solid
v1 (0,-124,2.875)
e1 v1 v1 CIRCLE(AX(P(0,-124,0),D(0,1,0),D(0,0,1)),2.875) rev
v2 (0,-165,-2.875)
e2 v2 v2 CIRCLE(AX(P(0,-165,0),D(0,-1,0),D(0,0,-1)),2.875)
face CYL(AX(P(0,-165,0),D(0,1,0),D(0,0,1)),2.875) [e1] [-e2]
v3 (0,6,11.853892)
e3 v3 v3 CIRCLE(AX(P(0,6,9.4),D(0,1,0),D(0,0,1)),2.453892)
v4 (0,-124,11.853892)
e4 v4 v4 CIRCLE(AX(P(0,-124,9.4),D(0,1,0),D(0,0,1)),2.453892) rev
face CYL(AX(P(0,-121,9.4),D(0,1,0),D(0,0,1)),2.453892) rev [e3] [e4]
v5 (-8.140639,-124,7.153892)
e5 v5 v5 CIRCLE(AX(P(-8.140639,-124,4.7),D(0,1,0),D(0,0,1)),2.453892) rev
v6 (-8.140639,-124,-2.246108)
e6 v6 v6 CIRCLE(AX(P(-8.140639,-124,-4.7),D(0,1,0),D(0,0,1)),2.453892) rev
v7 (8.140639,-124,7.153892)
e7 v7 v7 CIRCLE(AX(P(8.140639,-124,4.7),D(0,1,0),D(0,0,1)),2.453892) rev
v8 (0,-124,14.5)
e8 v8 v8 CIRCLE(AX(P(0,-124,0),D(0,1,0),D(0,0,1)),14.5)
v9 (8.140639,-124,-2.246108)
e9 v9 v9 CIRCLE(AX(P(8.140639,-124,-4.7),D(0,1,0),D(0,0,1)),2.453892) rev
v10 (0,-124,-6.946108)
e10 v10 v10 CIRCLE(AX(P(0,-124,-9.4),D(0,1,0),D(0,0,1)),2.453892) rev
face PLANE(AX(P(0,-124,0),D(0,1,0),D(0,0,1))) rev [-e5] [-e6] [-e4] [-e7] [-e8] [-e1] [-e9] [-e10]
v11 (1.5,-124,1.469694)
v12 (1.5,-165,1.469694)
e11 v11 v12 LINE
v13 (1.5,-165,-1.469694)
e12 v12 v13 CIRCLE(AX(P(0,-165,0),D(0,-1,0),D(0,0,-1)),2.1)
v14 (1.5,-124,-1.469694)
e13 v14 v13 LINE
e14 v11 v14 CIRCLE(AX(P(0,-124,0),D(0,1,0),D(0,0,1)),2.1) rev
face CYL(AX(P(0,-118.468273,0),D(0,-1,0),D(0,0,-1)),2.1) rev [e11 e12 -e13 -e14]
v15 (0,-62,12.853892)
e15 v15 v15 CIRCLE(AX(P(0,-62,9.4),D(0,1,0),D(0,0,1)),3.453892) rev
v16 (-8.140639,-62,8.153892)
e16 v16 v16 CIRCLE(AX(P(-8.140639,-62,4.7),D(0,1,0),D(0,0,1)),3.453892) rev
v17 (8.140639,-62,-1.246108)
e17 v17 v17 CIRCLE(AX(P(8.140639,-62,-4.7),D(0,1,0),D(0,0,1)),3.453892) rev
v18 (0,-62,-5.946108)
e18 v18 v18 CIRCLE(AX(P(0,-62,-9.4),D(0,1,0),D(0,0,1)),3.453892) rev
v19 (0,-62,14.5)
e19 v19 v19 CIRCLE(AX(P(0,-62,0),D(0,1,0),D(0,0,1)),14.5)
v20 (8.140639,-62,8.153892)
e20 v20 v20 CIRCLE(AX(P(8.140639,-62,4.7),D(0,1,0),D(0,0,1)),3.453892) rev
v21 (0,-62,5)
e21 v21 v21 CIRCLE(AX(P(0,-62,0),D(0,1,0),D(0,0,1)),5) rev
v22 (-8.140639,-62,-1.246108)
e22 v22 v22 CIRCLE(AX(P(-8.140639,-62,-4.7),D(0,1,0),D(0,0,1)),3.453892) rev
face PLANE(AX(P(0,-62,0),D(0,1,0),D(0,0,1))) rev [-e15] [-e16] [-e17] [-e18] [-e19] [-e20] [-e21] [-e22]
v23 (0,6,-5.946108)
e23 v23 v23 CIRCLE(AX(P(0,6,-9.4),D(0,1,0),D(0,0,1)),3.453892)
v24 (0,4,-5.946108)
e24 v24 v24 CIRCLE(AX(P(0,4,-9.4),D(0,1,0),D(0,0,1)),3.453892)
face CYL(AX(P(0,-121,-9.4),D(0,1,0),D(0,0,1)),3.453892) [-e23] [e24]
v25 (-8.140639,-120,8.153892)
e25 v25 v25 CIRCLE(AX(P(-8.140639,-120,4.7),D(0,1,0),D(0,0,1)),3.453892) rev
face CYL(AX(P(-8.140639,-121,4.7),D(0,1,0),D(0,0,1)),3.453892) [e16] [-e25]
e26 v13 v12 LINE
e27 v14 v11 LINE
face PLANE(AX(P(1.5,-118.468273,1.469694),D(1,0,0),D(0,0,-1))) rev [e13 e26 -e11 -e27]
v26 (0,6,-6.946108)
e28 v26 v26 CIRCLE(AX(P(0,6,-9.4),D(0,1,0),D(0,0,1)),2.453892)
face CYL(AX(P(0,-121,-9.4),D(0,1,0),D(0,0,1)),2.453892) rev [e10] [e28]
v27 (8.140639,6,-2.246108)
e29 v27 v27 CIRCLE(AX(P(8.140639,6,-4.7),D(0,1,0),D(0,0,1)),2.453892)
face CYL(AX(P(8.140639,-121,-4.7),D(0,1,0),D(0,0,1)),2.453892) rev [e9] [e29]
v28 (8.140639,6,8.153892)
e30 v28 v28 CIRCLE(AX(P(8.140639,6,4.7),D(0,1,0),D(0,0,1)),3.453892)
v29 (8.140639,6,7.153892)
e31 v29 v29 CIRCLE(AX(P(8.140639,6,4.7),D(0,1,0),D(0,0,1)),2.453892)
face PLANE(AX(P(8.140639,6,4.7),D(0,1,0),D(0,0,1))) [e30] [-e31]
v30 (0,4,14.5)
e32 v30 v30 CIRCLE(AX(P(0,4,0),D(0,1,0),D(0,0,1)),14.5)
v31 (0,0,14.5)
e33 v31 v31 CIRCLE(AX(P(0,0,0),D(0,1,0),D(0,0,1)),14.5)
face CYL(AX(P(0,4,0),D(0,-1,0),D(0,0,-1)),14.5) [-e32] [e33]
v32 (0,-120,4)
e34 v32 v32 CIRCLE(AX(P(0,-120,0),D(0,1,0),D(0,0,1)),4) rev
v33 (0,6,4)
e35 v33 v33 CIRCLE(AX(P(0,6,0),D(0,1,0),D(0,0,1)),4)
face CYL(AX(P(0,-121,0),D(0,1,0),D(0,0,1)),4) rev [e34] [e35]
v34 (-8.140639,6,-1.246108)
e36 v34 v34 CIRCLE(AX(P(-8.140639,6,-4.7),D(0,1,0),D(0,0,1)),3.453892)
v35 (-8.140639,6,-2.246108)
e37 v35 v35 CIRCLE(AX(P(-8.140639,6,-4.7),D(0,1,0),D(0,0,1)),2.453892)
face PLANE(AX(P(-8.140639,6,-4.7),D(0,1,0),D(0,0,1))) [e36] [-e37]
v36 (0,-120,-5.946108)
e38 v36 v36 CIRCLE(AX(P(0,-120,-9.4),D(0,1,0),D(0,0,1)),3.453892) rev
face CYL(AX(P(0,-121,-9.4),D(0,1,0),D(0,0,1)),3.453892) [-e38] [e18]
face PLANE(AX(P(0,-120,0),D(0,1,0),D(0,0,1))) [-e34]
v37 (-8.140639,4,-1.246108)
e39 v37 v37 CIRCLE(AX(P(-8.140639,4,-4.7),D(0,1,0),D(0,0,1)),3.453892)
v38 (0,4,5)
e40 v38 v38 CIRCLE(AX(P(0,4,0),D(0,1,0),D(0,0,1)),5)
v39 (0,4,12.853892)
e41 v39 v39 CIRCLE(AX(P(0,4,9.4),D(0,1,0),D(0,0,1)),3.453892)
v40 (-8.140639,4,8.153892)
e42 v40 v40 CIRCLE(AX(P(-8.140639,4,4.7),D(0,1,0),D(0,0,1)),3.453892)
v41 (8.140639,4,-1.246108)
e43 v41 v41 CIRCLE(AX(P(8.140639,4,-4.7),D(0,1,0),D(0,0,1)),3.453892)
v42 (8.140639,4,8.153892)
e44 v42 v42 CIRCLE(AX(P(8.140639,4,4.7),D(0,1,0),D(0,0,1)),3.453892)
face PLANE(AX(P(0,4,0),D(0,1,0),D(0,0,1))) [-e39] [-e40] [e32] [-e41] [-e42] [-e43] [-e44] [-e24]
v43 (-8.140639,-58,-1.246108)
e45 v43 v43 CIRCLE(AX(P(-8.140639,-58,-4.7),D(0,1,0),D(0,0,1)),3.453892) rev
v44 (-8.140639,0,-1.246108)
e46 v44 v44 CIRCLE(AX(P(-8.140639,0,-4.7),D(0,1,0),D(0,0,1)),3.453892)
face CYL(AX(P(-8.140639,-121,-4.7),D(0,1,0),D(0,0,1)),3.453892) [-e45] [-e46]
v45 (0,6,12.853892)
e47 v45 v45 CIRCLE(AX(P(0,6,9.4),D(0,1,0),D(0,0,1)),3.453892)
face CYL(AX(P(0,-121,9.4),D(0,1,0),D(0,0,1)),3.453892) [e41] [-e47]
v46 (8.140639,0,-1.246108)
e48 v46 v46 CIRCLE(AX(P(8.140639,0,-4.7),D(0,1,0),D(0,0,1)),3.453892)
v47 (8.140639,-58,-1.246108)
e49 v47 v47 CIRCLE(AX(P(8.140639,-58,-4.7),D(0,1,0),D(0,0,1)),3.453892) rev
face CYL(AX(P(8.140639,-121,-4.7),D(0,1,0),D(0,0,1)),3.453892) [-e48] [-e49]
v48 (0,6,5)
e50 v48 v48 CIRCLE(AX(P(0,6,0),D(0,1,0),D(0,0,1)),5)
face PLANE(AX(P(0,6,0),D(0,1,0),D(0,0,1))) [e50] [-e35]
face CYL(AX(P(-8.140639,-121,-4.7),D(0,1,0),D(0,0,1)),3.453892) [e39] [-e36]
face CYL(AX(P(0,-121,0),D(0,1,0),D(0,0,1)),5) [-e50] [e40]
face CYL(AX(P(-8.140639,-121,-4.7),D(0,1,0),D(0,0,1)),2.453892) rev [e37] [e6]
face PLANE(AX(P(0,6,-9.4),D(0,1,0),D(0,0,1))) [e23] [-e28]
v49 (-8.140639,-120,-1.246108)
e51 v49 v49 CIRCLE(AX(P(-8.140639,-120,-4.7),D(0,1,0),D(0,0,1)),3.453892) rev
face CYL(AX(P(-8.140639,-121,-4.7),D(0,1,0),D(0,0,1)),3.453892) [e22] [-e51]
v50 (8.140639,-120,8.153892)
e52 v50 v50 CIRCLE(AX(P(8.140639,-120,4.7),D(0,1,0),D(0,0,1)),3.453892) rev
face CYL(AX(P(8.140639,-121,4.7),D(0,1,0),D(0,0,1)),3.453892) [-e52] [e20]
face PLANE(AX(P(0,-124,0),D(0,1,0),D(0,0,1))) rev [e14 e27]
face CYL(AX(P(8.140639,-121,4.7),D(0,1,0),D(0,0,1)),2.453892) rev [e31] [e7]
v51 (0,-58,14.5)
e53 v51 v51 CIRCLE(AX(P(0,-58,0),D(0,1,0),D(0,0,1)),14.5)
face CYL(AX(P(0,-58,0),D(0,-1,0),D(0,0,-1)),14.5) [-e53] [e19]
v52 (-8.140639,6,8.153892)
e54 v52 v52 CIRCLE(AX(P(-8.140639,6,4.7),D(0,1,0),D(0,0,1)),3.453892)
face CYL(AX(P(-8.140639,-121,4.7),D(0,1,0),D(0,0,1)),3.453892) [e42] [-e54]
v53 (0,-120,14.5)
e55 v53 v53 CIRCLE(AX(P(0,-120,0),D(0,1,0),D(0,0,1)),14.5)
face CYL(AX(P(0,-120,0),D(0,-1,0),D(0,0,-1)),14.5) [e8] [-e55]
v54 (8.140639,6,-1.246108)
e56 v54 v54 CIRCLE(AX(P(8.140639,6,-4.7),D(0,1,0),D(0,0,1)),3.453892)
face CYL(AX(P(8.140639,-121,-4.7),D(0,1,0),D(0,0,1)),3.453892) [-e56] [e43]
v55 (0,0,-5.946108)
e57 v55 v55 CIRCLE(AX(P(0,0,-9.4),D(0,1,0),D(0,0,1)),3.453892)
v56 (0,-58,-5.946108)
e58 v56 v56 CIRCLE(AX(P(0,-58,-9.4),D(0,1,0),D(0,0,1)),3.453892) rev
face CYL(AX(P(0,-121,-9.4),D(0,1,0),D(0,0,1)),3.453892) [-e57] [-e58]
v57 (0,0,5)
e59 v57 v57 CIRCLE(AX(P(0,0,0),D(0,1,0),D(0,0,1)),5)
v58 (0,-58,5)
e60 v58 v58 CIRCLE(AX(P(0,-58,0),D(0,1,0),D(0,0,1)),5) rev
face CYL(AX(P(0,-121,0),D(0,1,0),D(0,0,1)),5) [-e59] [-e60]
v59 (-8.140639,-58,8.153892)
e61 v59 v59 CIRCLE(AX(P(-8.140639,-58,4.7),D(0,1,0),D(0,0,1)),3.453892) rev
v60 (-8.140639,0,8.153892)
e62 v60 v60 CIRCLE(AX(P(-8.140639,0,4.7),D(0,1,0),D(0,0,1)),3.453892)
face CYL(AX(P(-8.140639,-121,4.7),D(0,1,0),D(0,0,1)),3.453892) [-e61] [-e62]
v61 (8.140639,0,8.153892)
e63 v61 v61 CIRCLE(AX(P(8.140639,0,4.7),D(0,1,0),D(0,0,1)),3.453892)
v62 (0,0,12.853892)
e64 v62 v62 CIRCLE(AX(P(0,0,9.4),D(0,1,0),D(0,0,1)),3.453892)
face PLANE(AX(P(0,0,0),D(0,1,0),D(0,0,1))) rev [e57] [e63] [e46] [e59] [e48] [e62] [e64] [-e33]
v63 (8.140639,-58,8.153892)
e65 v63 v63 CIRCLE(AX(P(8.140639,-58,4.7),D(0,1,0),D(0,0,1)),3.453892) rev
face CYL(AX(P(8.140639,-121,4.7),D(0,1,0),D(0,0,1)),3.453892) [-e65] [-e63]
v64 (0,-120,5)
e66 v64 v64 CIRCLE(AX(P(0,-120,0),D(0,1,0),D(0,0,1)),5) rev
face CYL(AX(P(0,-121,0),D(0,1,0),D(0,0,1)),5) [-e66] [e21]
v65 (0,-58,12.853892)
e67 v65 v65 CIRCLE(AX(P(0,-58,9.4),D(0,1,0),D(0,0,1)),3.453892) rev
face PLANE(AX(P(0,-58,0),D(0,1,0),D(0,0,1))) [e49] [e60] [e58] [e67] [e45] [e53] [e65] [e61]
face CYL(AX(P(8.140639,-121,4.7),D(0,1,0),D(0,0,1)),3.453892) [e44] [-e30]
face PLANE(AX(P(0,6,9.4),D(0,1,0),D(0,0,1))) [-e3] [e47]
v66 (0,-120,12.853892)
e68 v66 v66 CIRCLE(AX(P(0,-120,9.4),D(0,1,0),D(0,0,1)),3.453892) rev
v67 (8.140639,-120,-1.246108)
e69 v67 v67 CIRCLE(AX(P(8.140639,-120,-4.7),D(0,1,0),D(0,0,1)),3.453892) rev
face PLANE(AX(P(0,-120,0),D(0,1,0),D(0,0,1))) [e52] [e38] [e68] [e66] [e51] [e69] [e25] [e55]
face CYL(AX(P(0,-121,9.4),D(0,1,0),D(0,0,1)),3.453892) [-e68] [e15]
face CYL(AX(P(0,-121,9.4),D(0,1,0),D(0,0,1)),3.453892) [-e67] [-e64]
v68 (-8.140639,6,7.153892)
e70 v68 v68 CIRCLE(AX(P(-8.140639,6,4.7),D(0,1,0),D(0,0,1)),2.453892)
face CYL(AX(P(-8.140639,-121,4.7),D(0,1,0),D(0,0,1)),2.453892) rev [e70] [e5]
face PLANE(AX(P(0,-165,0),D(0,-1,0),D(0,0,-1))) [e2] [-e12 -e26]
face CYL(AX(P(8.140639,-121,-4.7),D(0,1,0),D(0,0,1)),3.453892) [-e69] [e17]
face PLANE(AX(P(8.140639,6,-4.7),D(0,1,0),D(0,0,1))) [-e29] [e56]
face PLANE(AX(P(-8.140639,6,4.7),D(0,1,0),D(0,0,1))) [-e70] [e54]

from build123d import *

# Parameters (mm, degrees)
SKETCH1_R                = 14.5
BOSS_EXTRUDE1_DEPTH      = 4
BOSS_EXTRUDE2_DEPTH      = 2
BOSS_EXTRUDE2_DEPTH_BACK = 125
SKETCH2_R                = 5
SKETCH2_R_2              = 4
SKETCH2_R_3              = 3.453892414
SKETCH2_R_4              = 2.453892414
LPATTERN4_START          = -124
LPATTERN4_OUTLINE_R      = 14.5
LPATTERN4_DEPTH          = 4
LPATTERN4_START_2        = -62
LPATTERN4_2_OUTLINE_R    = 14.5
LPATTERN4_2_OUTLINE_R_2  = 3.453892414
LPATTERN4_2_OUTLINE_R_3  = 5
LPATTERN4_2_OUTLINE_R_4  = 4
LPATTERN4_2_OUTLINE_R_5  = 2.453892414
LPATTERN4_2_DEPTH        = 4
SKETCH8_R                = 2.453892414
CUT_EXTRUDE4_DEPTH       = 128
SKETCH12_R               = 2.875
BOSS_EXTRUDE4_DEPTH      = 41
CUT_EXTRUDE5_DEPTH       = 41
SKETCH14_R               = 4
CUT_EXTRUDE6_DEPTH       = 124


# Read off the part's stored shape, not the designer's step: LPattern4
with BuildPart() as part:
    # Sketch1 → Boss-Extrude1 (new body)
    with BuildSketch(Plane(origin=(0, 0, 0), x_dir=(1, 0, 0), z_dir=(0, 1, 0))):
        with Locations(Location((0, 0, 0), (0, 0, 270))):
            Circle(SKETCH1_R)
    extrude(amount=BOSS_EXTRUDE1_DEPTH)

    # Sketch2 → Boss-Extrude2 (add, two sides: drawn at the far end of the back side and taken through both)
    # profile 1 of 7: a face of its own
    with BuildSketch(Plane(origin=(0, 4, 0), x_dir=(1, 0, 0), z_dir=(0, 1, 0)).offset(-BOSS_EXTRUDE2_DEPTH_BACK)):
        with Locations(Location((0, 0, 0), (0, 0, 270))):
            Circle(SKETCH2_R)
        with Locations(Location((0, 0, 0), (0, 0, 270))):
            Circle(SKETCH2_R_2, mode=Mode.SUBTRACT)
    # profile 2 of 7: a face of its own
    with BuildSketch(Plane(origin=(0, 4, 0), x_dir=(1, 0, 0), z_dir=(0, 1, 0)).offset(-BOSS_EXTRUDE2_DEPTH_BACK)):
        with Locations(Location((0, 9.4, 0), (0, 0, 270))):
            Circle(SKETCH2_R_3)
        with Locations(Location((0, 9.4, 0), (0, 0, 270))):
            Circle(SKETCH2_R_4, mode=Mode.SUBTRACT)
    # profile 3 of 7: a face of its own
    with BuildSketch(Plane(origin=(0, 4, 0), x_dir=(1, 0, 0), z_dir=(0, 1, 0)).offset(-BOSS_EXTRUDE2_DEPTH_BACK)):
        with Locations(Location((8.140638796, 4.7, 0), (0, 0, 270))):
            Circle(SKETCH2_R_3)
        with Locations(Location((8.140638796, 4.7, 0), (0, 0, 270))):
            Circle(SKETCH2_R_4, mode=Mode.SUBTRACT)
    # profile 4 of 7: a face of its own
    with BuildSketch(Plane(origin=(0, 4, 0), x_dir=(1, 0, 0), z_dir=(0, 1, 0)).offset(-BOSS_EXTRUDE2_DEPTH_BACK)):
        with Locations(Location((8.140638796, -4.7, 0), (0, 0, 270))):
            Circle(SKETCH2_R_3)
        with Locations(Location((8.140638796, -4.7, 0), (0, 0, 270))):
            Circle(SKETCH2_R_4, mode=Mode.SUBTRACT)
    # profile 5 of 7: a face of its own
    with BuildSketch(Plane(origin=(0, 4, 0), x_dir=(1, 0, 0), z_dir=(0, 1, 0)).offset(-BOSS_EXTRUDE2_DEPTH_BACK)):
        with Locations(Location((0, -9.4, 0), (0, 0, 270))):
            Circle(SKETCH2_R_3)
        with Locations(Location((0, -9.4, 0), (0, 0, 270))):
            Circle(SKETCH2_R_4, mode=Mode.SUBTRACT)
    # profile 6 of 7: a face of its own
    with BuildSketch(Plane(origin=(0, 4, 0), x_dir=(1, 0, 0), z_dir=(0, 1, 0)).offset(-BOSS_EXTRUDE2_DEPTH_BACK)):
        with Locations(Location((-8.140638796, -4.7, 0), (0, 0, 270))):
            Circle(SKETCH2_R_3)
        with Locations(Location((-8.140638796, -4.7, 0), (0, 0, 270))):
            Circle(SKETCH2_R_4, mode=Mode.SUBTRACT)
    # profile 7 of 7: a face of its own
    with BuildSketch(Plane(origin=(0, 4, 0), x_dir=(1, 0, 0), z_dir=(0, 1, 0)).offset(-BOSS_EXTRUDE2_DEPTH_BACK)):
        with Locations(Location((-8.140638796, 4.7, 0), (0, 0, 270))):
            Circle(SKETCH2_R_3)
        with Locations(Location((-8.140638796, 4.7, 0), (0, 0, 270))):
            Circle(SKETCH2_R_4, mode=Mode.SUBTRACT)
    extrude(amount=BOSS_EXTRUDE2_DEPTH + BOSS_EXTRUDE2_DEPTH_BACK)

    # LPattern4 outline → LPattern4 (add)
    with BuildSketch(Plane(origin=(0, 0, 0), x_dir=(1, 0, 0), z_dir=(0, 1, 0)).offset(LPATTERN4_START)):
        Circle(LPATTERN4_OUTLINE_R)
    extrude(amount=LPATTERN4_DEPTH)

    # LPattern4 2 outline → LPattern4 2 (add)
    # profile 1 of 8: a face of its own
    with BuildSketch(Plane(origin=(0, 0, 0), x_dir=(1, 0, 0), z_dir=(0, 1, 0)).offset(LPATTERN4_START_2)):
        Circle(LPATTERN4_2_OUTLINE_R)
        with Locations((-8.140638796, -4.7)):
            Circle(LPATTERN4_2_OUTLINE_R_2, mode=Mode.SUBTRACT)
        with Locations((0, -9.4)):
            Circle(LPATTERN4_2_OUTLINE_R_2, mode=Mode.SUBTRACT)
        with Locations((8.140638796, -4.7)):
            Circle(LPATTERN4_2_OUTLINE_R_2, mode=Mode.SUBTRACT)
        with Locations((-8.140638796, 4.7)):
            Circle(LPATTERN4_2_OUTLINE_R_2, mode=Mode.SUBTRACT)
        Circle(LPATTERN4_2_OUTLINE_R_3, mode=Mode.SUBTRACT)
        with Locations((8.140638796, 4.7)):
            Circle(LPATTERN4_2_OUTLINE_R_2, mode=Mode.SUBTRACT)
        with Locations((0, 9.4)):
            Circle(LPATTERN4_2_OUTLINE_R_2, mode=Mode.SUBTRACT)
    # profile 2 of 8: a face of its own
    with BuildSketch(Plane(origin=(0, 0, 0), x_dir=(1, 0, 0), z_dir=(0, 1, 0)).offset(LPATTERN4_START_2)):
        Circle(LPATTERN4_2_OUTLINE_R_4)
    # profile 3 of 8: a face of its own
    with BuildSketch(Plane(origin=(0, 0, 0), x_dir=(1, 0, 0), z_dir=(0, 1, 0)).offset(LPATTERN4_START_2)):
        with Locations((0, 9.4)):
            Circle(LPATTERN4_2_OUTLINE_R_5)
    # profile 4 of 8: a face of its own
    with BuildSketch(Plane(origin=(0, 0, 0), x_dir=(1, 0, 0), z_dir=(0, 1, 0)).offset(LPATTERN4_START_2)):
        with Locations((8.140638796, 4.7)):
            Circle(LPATTERN4_2_OUTLINE_R_5)
    # profile 5 of 8: a face of its own
    with BuildSketch(Plane(origin=(0, 0, 0), x_dir=(1, 0, 0), z_dir=(0, 1, 0)).offset(LPATTERN4_START_2)):
        with Locations((8.140638796, -4.7)):
            Circle(LPATTERN4_2_OUTLINE_R_5)
    # profile 6 of 8: a face of its own
    with BuildSketch(Plane(origin=(0, 0, 0), x_dir=(1, 0, 0), z_dir=(0, 1, 0)).offset(LPATTERN4_START_2)):
        with Locations((0, -9.4)):
            Circle(LPATTERN4_2_OUTLINE_R_5)
    # profile 7 of 8: a face of its own
    with BuildSketch(Plane(origin=(0, 0, 0), x_dir=(1, 0, 0), z_dir=(0, 1, 0)).offset(LPATTERN4_START_2)):
        with Locations((-8.140638796, -4.7)):
            Circle(LPATTERN4_2_OUTLINE_R_5)
    # profile 8 of 8: a face of its own
    with BuildSketch(Plane(origin=(0, 0, 0), x_dir=(1, 0, 0), z_dir=(0, 1, 0)).offset(LPATTERN4_START_2)):
        with Locations((-8.140638796, 4.7)):
            Circle(LPATTERN4_2_OUTLINE_R_5)
    extrude(amount=LPATTERN4_2_DEPTH)

    # Sketch8 → Cut-Extrude4 (cut)
    with BuildSketch(Plane(origin=(0, 4, 0), x_dir=(1, 0, 0), z_dir=(0, 1, 0))):
        with Locations(Location((-8.140638796, -4.7, 0), (0, 0, 270))):
            Circle(SKETCH8_R)
        with Locations(Location((0, -9.4, 0), (0, 0, 270))):
            Circle(SKETCH8_R)
        with Locations(Location((8.140638796, -4.7, 0), (0, 0, 270))):
            Circle(SKETCH8_R)
        with Locations(Location((8.140638796, 4.7, 0), (0, 0, 270))):
            Circle(SKETCH8_R)
        with Locations(Location((0, 9.4, 0), (0, 0, 270))):
            Circle(SKETCH8_R)
        with Locations(Location((-8.140638796, 4.7, 0), (0, 0, 270))):
            Circle(SKETCH8_R)
    extrude(amount=-CUT_EXTRUDE4_DEPTH, mode=Mode.SUBTRACT)

    # Sketch12 → Boss-Extrude4 (add)
    with BuildSketch(Plane.XZ.offset(124)):
        with Locations(Location((0, 0, 0), (0, 0, 90))):
            Circle(SKETCH12_R)
    extrude(amount=BOSS_EXTRUDE4_DEPTH)

    # Sketch9 → Cut-Extrude5 (cut)
    with BuildSketch(Plane.XZ.offset(165)):
        with BuildLine():
            Line((1.5, 1.469693846), (1.5, -1.469693846))
            ThreePointArc((1.5, -1.469693846), (-2.1, 0), (1.5, 1.469693846))
        make_face()
    extrude(amount=-CUT_EXTRUDE5_DEPTH, mode=Mode.SUBTRACT)

    # Sketch14 → Cut-Extrude6 (cut)
    with BuildSketch(Plane(origin=(0, 4, 0), x_dir=(1, 0, 0), z_dir=(0, 1, 0))):
        with Locations(Location((0, 0, 0), (0, 0, 270))):
            Circle(SKETCH14_R)
    extrude(amount=-CUT_EXTRUDE6_DEPTH, mode=Mode.SUBTRACT)


solid = part.part
